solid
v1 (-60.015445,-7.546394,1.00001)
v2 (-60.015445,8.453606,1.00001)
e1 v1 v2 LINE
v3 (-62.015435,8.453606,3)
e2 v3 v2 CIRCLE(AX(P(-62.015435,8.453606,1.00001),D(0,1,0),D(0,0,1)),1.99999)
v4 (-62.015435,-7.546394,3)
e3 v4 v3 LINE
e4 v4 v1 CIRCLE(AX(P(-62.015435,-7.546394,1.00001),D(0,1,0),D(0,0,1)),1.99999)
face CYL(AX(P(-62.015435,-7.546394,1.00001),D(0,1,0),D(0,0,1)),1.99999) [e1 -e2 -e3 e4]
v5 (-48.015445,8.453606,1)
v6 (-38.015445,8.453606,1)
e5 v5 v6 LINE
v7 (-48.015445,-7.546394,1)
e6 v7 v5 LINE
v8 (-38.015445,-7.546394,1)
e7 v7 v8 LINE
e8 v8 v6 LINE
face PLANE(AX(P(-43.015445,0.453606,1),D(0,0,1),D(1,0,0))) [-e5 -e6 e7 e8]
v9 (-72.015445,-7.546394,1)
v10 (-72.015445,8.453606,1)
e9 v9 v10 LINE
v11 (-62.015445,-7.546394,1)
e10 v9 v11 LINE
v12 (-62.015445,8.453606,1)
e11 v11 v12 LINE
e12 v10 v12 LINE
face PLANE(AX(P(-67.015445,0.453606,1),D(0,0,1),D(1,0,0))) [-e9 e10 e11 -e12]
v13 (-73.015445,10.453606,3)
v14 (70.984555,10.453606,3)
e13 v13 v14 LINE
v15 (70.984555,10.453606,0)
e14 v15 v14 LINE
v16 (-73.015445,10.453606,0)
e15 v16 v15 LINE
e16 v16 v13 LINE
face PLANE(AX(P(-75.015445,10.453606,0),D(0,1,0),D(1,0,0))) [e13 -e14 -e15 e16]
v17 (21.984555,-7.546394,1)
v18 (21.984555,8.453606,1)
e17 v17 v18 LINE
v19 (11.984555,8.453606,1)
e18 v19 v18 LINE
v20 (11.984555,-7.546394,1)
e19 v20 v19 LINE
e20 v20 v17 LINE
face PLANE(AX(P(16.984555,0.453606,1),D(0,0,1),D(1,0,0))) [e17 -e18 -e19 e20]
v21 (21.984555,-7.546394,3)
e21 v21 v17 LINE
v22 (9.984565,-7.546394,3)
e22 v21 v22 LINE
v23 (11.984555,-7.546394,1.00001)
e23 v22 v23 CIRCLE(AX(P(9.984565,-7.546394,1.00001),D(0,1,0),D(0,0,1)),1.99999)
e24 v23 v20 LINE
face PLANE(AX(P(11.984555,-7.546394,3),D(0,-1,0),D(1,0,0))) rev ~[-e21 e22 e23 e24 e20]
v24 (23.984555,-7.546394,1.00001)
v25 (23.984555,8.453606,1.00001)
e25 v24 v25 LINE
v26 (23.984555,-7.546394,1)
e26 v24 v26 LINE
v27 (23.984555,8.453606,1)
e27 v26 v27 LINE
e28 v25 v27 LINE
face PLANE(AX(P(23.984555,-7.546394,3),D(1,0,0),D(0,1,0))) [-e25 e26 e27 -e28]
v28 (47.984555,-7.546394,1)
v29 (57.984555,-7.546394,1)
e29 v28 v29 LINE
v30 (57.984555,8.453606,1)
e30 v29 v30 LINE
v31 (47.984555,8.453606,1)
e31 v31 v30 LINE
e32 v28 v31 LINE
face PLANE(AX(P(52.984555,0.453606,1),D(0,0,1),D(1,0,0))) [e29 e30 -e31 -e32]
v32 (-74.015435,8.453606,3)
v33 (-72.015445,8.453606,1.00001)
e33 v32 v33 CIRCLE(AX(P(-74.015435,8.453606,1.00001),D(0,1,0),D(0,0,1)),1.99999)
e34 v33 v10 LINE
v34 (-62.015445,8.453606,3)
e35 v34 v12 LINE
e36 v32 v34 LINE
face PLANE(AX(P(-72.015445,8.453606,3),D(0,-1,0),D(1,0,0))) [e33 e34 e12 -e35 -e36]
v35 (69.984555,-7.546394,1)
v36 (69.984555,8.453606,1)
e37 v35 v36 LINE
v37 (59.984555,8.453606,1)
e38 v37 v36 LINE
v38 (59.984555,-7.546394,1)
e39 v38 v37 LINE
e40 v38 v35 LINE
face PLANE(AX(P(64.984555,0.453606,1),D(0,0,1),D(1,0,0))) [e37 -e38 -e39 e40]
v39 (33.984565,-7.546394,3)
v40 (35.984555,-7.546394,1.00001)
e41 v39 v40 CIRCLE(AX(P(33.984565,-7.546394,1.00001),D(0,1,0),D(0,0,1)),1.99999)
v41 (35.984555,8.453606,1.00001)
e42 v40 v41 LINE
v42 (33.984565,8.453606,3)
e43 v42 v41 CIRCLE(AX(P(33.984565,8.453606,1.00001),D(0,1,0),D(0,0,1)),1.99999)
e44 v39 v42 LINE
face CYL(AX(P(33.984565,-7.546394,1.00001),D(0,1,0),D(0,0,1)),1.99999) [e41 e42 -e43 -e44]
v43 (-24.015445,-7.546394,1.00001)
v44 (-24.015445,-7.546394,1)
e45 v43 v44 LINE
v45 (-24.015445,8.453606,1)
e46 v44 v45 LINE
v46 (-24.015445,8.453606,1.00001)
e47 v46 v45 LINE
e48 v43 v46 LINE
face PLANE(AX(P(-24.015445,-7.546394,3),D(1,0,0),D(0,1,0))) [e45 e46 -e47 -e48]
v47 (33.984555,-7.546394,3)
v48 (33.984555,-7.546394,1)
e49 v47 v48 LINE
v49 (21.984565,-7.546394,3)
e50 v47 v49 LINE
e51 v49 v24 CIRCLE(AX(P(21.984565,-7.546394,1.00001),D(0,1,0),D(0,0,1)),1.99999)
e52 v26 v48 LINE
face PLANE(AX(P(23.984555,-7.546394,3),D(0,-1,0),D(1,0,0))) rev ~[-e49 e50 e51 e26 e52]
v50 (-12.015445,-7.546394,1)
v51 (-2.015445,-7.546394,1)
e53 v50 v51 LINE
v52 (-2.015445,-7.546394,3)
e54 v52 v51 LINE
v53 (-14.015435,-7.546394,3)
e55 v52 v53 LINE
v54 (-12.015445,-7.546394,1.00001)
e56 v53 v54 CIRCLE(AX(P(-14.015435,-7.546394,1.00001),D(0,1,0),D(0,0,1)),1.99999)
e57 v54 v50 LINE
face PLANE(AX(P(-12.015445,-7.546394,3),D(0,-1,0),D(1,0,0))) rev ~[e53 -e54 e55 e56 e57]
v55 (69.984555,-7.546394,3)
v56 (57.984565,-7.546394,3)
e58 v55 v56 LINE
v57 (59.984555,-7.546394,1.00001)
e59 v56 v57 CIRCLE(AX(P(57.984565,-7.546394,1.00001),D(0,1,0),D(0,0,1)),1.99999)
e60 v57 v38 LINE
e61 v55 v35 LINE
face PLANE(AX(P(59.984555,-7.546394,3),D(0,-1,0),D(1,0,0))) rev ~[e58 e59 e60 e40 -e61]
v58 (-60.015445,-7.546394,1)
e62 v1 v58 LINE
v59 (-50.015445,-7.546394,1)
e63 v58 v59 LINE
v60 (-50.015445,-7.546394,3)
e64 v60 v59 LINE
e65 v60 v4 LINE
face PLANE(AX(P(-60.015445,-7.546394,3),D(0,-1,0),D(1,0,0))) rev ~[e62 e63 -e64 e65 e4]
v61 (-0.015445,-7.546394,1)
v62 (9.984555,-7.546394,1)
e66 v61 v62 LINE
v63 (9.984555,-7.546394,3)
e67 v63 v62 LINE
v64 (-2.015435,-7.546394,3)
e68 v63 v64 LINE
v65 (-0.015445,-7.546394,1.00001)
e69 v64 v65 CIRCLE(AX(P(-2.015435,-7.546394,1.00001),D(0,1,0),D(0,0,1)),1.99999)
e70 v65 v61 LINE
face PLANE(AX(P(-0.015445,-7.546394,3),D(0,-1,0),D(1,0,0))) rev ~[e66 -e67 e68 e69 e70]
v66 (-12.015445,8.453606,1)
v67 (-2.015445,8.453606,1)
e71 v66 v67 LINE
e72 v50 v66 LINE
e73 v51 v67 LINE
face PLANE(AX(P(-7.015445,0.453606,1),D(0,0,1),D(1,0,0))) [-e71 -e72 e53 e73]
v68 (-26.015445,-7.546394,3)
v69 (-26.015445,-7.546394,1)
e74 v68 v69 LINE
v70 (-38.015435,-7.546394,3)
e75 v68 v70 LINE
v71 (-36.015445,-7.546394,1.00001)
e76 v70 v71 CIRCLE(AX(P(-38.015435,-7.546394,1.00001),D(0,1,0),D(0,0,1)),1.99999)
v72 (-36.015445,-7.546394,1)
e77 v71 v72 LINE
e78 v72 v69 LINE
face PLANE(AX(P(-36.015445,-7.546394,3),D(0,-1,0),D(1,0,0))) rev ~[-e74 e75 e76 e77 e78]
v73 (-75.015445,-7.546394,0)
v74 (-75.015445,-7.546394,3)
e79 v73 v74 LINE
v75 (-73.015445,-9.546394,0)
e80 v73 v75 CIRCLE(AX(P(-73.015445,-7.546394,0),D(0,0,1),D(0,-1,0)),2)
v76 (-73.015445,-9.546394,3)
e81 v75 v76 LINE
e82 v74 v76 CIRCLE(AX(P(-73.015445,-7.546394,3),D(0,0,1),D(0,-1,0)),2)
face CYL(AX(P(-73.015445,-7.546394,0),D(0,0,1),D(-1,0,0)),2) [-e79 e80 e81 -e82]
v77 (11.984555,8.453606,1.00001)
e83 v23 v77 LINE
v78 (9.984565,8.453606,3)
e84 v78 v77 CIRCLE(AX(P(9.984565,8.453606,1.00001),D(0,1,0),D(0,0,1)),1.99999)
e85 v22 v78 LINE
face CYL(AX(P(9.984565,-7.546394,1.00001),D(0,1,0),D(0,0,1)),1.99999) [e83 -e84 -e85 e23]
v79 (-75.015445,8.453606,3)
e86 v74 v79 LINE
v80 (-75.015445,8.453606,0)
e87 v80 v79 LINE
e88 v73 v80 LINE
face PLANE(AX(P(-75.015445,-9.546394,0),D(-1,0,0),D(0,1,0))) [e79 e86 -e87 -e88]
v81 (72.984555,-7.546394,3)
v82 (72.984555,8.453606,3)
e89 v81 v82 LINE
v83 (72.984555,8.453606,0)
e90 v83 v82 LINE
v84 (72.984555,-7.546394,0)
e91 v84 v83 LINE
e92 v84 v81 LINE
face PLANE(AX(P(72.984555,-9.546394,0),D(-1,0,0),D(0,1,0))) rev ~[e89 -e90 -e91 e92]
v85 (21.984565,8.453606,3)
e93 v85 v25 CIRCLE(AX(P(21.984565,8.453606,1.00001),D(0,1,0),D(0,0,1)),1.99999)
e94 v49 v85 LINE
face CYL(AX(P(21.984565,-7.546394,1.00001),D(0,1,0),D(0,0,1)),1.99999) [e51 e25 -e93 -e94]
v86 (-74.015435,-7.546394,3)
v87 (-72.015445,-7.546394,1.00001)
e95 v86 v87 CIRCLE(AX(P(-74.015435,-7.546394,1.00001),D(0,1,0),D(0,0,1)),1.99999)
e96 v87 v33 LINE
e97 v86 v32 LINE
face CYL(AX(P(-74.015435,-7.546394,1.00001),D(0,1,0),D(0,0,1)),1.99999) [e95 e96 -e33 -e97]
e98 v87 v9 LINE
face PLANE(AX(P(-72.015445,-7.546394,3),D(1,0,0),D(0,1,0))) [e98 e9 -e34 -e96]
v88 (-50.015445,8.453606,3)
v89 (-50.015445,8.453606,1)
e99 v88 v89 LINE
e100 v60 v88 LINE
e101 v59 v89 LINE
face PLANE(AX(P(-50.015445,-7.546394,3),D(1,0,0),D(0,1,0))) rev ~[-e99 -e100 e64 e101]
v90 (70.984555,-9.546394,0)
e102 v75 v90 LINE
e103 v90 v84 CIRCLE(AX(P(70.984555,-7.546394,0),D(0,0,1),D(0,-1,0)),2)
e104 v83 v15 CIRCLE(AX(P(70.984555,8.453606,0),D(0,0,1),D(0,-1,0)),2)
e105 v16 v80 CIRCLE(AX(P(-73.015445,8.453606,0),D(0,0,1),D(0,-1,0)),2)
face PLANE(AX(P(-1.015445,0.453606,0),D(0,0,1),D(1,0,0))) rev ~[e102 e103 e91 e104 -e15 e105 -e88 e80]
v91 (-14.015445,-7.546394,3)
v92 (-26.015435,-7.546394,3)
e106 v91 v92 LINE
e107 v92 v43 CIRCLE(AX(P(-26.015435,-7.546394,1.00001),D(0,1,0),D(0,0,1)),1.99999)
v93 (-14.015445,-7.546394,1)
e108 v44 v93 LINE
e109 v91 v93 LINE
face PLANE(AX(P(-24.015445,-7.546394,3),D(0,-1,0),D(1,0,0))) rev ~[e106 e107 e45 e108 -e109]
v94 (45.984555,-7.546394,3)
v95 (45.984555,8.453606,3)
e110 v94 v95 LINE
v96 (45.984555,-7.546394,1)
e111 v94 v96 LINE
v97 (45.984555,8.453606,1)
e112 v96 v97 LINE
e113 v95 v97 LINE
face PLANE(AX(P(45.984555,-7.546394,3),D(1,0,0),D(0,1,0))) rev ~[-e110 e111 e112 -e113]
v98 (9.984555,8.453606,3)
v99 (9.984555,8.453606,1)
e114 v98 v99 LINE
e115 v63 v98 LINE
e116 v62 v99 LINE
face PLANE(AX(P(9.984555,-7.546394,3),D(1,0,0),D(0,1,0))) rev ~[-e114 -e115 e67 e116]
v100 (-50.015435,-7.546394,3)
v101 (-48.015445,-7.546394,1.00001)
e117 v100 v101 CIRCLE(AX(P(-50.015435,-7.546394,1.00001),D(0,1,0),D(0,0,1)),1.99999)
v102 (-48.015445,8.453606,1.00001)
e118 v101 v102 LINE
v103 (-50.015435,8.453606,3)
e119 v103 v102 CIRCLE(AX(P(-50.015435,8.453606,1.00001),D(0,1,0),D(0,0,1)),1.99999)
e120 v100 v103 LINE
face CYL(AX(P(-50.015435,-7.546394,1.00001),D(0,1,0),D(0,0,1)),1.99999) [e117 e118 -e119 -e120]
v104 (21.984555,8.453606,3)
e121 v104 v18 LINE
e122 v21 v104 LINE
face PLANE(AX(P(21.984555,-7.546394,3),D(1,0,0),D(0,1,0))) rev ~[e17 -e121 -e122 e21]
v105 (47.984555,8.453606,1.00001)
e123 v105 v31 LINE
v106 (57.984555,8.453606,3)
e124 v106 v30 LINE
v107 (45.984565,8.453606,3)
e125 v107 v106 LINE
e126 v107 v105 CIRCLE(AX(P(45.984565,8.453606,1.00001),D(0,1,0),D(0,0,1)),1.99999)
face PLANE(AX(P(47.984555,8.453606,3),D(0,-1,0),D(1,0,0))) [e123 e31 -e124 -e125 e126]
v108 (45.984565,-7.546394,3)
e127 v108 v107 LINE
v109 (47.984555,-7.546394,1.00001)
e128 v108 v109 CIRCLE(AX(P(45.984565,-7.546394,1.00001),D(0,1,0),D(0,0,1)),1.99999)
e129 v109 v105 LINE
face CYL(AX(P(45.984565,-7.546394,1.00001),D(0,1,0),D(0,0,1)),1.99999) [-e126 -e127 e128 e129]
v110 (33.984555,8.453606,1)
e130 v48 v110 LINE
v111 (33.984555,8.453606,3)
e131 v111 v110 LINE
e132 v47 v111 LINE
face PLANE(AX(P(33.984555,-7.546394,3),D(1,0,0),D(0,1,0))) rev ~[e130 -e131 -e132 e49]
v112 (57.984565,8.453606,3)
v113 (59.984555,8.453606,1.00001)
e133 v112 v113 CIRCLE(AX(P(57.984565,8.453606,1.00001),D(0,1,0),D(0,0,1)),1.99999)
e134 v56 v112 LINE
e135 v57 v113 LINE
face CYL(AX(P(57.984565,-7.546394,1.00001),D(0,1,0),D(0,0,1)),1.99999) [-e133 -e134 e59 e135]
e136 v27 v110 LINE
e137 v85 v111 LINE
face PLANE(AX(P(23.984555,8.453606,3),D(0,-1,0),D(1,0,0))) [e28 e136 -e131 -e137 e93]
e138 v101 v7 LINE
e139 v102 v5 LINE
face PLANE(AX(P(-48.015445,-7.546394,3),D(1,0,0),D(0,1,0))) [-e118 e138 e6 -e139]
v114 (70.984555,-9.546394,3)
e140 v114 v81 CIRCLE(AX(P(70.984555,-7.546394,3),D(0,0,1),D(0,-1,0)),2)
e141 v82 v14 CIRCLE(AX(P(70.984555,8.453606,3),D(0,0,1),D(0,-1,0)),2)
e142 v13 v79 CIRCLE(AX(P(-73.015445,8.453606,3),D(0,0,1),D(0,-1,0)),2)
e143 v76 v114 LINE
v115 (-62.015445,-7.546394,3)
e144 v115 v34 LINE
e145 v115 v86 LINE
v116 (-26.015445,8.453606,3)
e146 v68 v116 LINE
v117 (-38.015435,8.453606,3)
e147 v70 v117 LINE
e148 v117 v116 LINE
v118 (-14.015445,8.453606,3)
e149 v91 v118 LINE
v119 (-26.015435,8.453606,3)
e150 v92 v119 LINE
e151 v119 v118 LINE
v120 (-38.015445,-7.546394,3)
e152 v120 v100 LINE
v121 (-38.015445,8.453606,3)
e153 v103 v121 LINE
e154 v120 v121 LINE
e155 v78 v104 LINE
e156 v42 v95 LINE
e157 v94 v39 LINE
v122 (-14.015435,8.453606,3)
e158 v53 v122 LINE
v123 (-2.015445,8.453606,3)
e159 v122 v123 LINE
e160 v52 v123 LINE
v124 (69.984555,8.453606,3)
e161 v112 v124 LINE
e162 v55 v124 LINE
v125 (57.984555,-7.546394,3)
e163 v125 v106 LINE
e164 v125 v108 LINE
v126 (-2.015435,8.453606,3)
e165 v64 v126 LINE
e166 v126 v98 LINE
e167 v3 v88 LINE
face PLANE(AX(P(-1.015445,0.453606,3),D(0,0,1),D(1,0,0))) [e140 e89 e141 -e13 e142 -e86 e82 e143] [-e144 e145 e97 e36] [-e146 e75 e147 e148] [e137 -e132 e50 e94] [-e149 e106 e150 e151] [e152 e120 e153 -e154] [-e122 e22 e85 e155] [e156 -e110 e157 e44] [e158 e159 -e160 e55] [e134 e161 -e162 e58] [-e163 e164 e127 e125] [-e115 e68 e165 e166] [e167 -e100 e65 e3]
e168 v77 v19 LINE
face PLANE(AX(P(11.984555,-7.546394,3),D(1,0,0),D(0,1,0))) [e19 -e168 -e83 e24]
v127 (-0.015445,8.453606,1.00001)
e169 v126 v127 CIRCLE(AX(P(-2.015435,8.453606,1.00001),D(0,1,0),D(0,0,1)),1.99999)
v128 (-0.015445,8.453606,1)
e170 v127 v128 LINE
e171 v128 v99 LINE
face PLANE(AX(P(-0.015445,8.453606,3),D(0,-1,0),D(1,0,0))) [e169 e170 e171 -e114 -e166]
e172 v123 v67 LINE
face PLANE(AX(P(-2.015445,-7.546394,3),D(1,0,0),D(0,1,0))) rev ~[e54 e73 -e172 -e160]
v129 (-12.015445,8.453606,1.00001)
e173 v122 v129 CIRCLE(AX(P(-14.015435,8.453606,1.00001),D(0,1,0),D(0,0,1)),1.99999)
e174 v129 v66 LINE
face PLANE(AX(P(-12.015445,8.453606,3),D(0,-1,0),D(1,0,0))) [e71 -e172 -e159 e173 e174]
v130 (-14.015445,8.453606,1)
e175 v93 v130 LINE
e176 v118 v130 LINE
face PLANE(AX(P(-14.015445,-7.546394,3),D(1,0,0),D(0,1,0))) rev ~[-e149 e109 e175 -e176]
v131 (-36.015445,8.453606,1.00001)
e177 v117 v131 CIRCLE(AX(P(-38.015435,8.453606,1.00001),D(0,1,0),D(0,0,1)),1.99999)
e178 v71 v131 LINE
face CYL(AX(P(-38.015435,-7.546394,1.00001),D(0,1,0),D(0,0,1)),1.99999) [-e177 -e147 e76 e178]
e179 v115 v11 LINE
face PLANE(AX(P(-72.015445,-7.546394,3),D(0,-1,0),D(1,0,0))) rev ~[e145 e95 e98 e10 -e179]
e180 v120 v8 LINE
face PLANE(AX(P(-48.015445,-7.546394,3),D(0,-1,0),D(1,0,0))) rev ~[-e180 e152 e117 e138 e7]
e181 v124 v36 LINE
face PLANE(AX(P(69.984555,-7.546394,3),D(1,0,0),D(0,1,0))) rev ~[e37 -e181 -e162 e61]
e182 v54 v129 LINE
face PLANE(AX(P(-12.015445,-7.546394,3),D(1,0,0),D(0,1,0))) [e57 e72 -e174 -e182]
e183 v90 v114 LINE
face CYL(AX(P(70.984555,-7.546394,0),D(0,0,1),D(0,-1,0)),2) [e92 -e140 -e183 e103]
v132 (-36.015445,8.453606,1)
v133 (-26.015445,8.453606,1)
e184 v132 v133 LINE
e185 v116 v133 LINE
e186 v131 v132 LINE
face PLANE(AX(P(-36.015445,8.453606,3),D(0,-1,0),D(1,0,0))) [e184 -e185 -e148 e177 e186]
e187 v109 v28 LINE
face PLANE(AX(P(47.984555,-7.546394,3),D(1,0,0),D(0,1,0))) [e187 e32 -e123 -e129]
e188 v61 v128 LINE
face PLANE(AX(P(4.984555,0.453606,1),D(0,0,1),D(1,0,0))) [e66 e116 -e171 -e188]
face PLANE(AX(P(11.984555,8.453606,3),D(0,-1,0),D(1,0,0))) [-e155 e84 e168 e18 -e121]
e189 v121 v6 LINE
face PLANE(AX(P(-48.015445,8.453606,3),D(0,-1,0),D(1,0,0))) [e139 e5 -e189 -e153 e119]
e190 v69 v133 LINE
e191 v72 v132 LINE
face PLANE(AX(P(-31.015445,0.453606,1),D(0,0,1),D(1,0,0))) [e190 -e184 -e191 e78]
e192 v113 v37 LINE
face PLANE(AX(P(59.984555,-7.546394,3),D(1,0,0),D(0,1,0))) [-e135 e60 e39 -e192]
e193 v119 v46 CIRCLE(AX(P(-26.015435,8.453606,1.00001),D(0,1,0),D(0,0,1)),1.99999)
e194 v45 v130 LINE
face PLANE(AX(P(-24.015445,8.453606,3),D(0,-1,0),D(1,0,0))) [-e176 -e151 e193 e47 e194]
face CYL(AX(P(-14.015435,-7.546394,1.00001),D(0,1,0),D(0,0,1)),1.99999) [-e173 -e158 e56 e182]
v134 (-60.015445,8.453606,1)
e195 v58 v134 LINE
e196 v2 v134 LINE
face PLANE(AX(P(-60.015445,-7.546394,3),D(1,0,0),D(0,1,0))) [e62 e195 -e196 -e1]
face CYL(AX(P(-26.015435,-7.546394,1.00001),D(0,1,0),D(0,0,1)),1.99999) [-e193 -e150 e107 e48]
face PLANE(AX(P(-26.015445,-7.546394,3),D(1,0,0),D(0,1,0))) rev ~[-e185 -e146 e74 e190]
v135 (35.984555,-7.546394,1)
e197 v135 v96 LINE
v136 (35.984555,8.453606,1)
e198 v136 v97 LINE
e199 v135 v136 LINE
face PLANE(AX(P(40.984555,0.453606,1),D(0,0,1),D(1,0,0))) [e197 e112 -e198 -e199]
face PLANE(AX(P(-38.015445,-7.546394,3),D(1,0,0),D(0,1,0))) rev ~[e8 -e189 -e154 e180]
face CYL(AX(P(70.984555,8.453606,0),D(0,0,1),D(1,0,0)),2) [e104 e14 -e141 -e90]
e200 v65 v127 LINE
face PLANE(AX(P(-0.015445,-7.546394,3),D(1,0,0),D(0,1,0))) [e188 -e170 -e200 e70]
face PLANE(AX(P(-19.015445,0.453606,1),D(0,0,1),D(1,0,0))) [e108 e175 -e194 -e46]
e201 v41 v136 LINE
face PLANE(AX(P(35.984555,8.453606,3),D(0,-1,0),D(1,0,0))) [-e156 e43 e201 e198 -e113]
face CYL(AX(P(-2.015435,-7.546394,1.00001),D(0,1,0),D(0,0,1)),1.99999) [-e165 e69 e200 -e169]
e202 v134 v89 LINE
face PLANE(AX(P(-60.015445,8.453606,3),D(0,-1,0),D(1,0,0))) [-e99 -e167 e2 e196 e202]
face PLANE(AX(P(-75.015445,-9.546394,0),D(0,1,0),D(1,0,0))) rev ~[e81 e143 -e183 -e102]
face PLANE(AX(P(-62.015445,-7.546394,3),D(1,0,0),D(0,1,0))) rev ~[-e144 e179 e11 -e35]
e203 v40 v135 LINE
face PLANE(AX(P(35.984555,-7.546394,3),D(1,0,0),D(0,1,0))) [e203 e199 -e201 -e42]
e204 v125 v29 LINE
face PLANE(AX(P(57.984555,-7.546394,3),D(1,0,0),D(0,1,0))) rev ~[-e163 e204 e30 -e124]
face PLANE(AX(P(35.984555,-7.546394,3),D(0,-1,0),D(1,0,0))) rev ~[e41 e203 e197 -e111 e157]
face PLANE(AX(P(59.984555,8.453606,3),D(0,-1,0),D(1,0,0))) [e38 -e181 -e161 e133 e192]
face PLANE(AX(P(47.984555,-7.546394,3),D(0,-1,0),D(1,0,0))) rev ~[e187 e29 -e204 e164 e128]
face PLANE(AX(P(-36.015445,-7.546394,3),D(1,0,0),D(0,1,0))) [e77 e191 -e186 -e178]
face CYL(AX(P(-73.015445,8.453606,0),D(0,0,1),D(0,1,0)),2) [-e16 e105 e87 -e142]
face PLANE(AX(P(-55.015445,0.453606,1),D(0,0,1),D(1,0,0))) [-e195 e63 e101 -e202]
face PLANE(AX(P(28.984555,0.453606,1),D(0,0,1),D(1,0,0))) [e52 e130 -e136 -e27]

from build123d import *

# Parameters (mm, degrees)
F0_W     = 148
F0_H     = 20
F1_DEPTH = 3
F2_W     = 10
F2_H     = 16
F3_DEPTH = 2
F4_R     = 2
F4_R_2   = 1.99999


# Not quite as in the source:
# - a fillet or chamfer is up to 0.001 mm smaller than in the source, because OpenCascade refuses the exact size


with BuildPart() as f1:
    # F0 (on Top) → F1 (new body)
    with BuildSketch(Plane.XY):
        with Locations((-1.0154450944, 0.4536062479)):
            Rectangle(F0_W, F0_H)
    extrude(amount=F1_DEPTH)

    # F2 (on face) → F3 (cut)
    with BuildSketch(Plane.XY.offset(3)):
        with Locations((-67.0154450944, 0.4536062479)):
            Rectangle(F2_W, F2_H)
        with Locations((-55.0154450944, 0.4536062479)):
            Rectangle(F2_W, F2_H)
        with Locations((-43.0154450944, 0.4536062479)):
            Rectangle(F2_W, F2_H)
        with Locations((-31.0154450944, 0.4536062479)):
            Rectangle(F2_W, F2_H)
        with Locations((-19.0154450944, 0.4536062479)):
            Rectangle(F2_W, F2_H)
        with Locations((-7.0154450944, 0.4536062479)):
            Rectangle(F2_W, F2_H)
        with Locations((4.9845549056, 0.4536062479)):
            Rectangle(F2_W, F2_H)
        with Locations((16.9845549056, 0.4536062479)):
            Rectangle(F2_W, F2_H)
        with Locations((28.9845549056, 0.4536062479)):
            Rectangle(F2_W, F2_H)
        with Locations((40.9845549056, 0.4536062479)):
            Rectangle(F2_W, F2_H)
        with Locations((52.9845549056, 0.4536062479)):
            Rectangle(F2_W, F2_H)
        with Locations((64.9845549056, 0.4536062479)):
            Rectangle(F2_W, F2_H)
    extrude(amount=-F3_DEPTH, mode=Mode.SUBTRACT)

    # F4 (call 1 of 16: OpenCascade refuses the feature's edges together)
    f4_edges = [f1.edges().sort_by_distance(p)[0] for p in [
        (-75.015445, -9.546394, 1.5),
    ]]
    fillet(f4_edges, radius=F4_R)

    # F4#2 (call 2 of 16)
    f4_2_edges = [f1.edges().sort_by_distance(p)[0] for p in [
        (72.984555, -9.546394, 1.5),
    ]]
    fillet(f4_2_edges, radius=F4_R)

    # F4#3 (call 3 of 16)
    f4_3_edges = [f1.edges().sort_by_distance(p)[0] for p in [
        (72.984555, 10.453606, 1.5),
    ]]
    fillet(f4_3_edges, radius=F4_R)

    # F4#4 (call 4 of 16)
    f4_4_edges = [f1.edges().sort_by_distance(p)[0] for p in [
        (-75.015445, 10.453606, 1.5),
    ]]
    fillet(f4_4_edges, radius=F4_R)

    # F4#5 (call 5 of 16) (radius 2 in the source; OpenCascade refuses exactly that, so slightly less here)
    f4_5_edges = [f1.edges().sort_by_distance(p)[0] for p in [
        (-72.015445, 0.453606, 3),
    ]]
    fillet(f4_5_edges, radius=F4_R_2)

    # F4#6 (call 6 of 16) (radius 2 in the source; OpenCascade refuses exactly that, so slightly less here)
    f4_6_edges = [f1.edges().sort_by_distance(p)[0] for p in [
        (-60.015445, 0.453606, 3),
    ]]
    fillet(f4_6_edges, radius=F4_R_2)

    # F4#7 (call 7 of 16) (radius 2 in the source; OpenCascade refuses exactly that, so slightly less here)
    f4_7_edges = [f1.edges().sort_by_distance(p)[0] for p in [
        (-48.015445, 0.453606, 3),
    ]]
    fillet(f4_7_edges, radius=F4_R_2)

    # F4#8 (call 8 of 16) (radius 2 in the source; OpenCascade refuses exactly that, so slightly less here)
    f4_8_edges = [f1.edges().sort_by_distance(p)[0] for p in [
        (-36.015445, 0.453606, 3),
    ]]
    fillet(f4_8_edges, radius=F4_R_2)

    # F4#9 (call 9 of 16) (radius 2 in the source; OpenCascade refuses exactly that, so slightly less here)
    f4_9_edges = [f1.edges().sort_by_distance(p)[0] for p in [
        (-24.015445, 0.453606, 3),
    ]]
    fillet(f4_9_edges, radius=F4_R_2)

    # F4#10 (call 10 of 16) (radius 2 in the source; OpenCascade refuses exactly that, so slightly less here)
    f4_10_edges = [f1.edges().sort_by_distance(p)[0] for p in [
        (-12.015445, 0.453606, 3),
    ]]
    fillet(f4_10_edges, radius=F4_R_2)

    # F4#11 (call 11 of 16) (radius 2 in the source; OpenCascade refuses exactly that, so slightly less here)
    f4_11_edges = [f1.edges().sort_by_distance(p)[0] for p in [
        (-0.015445, 0.453606, 3),
    ]]
    fillet(f4_11_edges, radius=F4_R_2)

    # F4#12 (call 12 of 16) (radius 2 in the source; OpenCascade refuses exactly that, so slightly less here)
    f4_12_edges = [f1.edges().sort_by_distance(p)[0] for p in [
        (11.984555, 0.453606, 3),
    ]]
    fillet(f4_12_edges, radius=F4_R_2)

    # F4#13 (call 13 of 16) (radius 2 in the source; OpenCascade refuses exactly that, so slightly less here)
    f4_13_edges = [f1.edges().sort_by_distance(p)[0] for p in [
        (23.984555, 0.453606, 3),
    ]]
    fillet(f4_13_edges, radius=F4_R_2)

    # F4#14 (call 14 of 16) (radius 2 in the source; OpenCascade refuses exactly that, so slightly less here)
    f4_14_edges = [f1.edges().sort_by_distance(p)[0] for p in [
        (35.984555, 0.453606, 3),
    ]]
    fillet(f4_14_edges, radius=F4_R_2)

    # F4#15 (call 15 of 16) (radius 2 in the source; OpenCascade refuses exactly that, so slightly less here)
    f4_15_edges = [f1.edges().sort_by_distance(p)[0] for p in [
        (47.984555, 0.453606, 3),
    ]]
    fillet(f4_15_edges, radius=F4_R_2)

    # F4#16 (call 16 of 16) (radius 2 in the source; OpenCascade refuses exactly that, so slightly less here)
    f4_16_edges = [f1.edges().sort_by_distance(p)[0] for p in [
        (59.984555, 0.453606, 3),
    ]]
    fillet(f4_16_edges, radius=F4_R_2)


solid = f1.part
